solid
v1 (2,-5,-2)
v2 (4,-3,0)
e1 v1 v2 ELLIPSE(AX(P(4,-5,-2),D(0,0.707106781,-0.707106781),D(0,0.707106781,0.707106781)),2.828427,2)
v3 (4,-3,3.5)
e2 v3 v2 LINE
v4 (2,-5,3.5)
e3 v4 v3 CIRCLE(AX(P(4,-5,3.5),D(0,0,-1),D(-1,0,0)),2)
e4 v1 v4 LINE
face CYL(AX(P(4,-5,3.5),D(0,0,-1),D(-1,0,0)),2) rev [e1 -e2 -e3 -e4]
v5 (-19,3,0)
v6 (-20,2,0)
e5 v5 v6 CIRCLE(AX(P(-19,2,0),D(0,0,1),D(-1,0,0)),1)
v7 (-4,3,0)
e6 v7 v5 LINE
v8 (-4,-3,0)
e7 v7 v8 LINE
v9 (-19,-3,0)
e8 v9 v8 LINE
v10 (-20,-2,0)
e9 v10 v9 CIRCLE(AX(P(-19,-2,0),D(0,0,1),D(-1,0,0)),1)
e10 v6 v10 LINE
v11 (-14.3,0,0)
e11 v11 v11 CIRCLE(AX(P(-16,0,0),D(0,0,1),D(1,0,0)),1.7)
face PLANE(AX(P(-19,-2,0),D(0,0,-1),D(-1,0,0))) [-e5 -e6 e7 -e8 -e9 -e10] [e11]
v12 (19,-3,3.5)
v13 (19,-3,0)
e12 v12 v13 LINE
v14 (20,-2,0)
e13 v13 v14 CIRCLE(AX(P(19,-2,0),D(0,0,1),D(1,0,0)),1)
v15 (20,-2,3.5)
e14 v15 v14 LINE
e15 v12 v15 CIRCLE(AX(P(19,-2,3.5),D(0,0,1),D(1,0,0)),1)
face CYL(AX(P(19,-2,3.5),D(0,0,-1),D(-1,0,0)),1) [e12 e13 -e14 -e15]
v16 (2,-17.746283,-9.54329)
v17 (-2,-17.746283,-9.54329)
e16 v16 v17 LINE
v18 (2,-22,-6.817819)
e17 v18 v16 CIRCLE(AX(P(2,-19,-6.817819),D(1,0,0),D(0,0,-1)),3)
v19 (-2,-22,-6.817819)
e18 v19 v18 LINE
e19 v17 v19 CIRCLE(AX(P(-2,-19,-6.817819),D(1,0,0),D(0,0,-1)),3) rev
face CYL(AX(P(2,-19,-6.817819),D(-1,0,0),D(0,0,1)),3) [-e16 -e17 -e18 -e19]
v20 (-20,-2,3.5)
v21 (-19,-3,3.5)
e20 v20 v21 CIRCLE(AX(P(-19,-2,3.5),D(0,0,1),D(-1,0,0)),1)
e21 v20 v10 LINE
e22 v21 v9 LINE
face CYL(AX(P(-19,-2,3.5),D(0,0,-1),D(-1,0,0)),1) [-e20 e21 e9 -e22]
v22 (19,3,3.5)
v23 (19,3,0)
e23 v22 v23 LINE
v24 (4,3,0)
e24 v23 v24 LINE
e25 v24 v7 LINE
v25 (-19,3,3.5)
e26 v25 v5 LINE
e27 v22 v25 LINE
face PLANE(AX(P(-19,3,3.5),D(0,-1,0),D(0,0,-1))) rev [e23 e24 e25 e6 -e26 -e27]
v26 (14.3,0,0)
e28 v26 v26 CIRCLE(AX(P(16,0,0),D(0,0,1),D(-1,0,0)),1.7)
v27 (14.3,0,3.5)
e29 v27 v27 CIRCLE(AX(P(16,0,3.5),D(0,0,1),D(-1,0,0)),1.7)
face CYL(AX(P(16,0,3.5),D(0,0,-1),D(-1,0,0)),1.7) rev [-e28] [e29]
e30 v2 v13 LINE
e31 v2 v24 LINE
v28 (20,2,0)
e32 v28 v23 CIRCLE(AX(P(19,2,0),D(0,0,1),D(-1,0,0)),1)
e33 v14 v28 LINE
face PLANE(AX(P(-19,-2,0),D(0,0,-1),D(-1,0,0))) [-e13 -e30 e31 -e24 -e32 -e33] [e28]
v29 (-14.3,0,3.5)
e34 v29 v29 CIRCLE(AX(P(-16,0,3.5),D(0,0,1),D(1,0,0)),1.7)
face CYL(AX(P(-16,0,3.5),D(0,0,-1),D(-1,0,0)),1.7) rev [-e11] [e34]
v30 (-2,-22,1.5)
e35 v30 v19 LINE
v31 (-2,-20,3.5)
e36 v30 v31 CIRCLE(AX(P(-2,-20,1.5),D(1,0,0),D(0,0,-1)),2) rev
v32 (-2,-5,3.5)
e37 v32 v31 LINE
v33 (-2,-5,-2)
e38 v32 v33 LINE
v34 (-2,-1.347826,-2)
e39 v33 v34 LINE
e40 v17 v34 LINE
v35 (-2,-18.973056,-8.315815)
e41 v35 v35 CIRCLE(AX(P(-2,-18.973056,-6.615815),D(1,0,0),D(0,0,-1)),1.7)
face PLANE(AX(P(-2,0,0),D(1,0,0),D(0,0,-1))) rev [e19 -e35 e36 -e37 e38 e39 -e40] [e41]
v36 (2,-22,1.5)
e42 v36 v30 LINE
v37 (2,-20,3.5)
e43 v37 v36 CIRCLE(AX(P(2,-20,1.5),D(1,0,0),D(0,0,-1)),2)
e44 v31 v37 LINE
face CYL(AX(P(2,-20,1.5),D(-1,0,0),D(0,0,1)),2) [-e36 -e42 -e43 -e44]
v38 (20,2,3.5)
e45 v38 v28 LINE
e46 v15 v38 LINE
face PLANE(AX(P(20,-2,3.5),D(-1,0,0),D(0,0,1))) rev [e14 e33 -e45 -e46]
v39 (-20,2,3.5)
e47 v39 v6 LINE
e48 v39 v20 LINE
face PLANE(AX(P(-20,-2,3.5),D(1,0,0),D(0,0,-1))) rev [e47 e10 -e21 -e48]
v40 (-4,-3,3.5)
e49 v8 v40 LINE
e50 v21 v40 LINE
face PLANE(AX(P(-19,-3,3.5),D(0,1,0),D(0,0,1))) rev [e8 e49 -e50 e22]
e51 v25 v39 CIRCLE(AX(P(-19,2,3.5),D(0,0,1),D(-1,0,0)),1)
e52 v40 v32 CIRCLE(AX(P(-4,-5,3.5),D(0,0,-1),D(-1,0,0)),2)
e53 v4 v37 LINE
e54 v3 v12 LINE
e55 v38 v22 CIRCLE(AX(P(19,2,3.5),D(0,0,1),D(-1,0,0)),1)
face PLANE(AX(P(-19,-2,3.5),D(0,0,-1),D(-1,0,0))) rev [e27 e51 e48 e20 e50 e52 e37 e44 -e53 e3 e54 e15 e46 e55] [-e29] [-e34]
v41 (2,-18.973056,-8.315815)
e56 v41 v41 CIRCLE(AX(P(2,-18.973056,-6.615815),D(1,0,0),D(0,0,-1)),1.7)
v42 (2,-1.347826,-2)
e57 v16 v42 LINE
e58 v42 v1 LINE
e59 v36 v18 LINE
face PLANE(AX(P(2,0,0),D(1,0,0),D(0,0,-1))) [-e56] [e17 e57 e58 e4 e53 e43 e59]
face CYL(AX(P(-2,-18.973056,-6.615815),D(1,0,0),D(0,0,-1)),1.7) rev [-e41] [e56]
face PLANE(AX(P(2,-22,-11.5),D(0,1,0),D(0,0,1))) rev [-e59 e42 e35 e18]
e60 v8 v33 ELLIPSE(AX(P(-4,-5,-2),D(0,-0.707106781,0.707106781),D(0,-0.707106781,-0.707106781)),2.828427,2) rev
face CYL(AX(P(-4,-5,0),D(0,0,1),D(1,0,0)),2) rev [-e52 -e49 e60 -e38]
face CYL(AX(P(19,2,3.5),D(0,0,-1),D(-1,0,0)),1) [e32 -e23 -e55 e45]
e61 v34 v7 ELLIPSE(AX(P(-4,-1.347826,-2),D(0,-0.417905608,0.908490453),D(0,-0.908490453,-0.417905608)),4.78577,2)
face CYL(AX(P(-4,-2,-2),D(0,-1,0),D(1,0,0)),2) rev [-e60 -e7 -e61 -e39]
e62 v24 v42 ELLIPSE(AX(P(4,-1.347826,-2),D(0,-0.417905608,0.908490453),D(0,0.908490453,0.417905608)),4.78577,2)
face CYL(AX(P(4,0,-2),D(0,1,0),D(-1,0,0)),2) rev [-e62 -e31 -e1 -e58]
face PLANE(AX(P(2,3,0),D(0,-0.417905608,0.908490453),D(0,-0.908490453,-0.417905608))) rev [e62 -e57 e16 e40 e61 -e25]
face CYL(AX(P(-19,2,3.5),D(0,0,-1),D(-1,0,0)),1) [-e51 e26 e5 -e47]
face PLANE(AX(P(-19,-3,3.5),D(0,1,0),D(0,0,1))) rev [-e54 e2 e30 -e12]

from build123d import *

# Parameters (mm, degrees)
SKETCH3_R           = 1.7
BOSS_EXTRUDE1_DEPTH = 3.5
BOSS_EXTRUDE2_DEPTH = 2
FILLET1_R           = 2
SKETCH5_R           = 1.7
CUT_EXTRUDE1_DEPTH  = 4
FILLET2_R           = 3


with BuildPart() as part:
    # Sketch3 → Boss-Extrude1 (new body)
    with BuildSketch(Plane.XY):
        with BuildLine():
            Line((-19, -3), (19, -3))
            ThreePointArc((19, -3), (19.707106781, -2.707106781), (20, -2))
            Line((20, -2), (20, 2))
            ThreePointArc((20, 2), (19.707106781, 2.707106781), (19, 3))
            Line((19, 3), (-19, 3))
            ThreePointArc((-19, 3), (-19.707106781, 2.707106781), (-20, 2))
            Line((-20, 2), (-20, -2))
            ThreePointArc((-20, -2), (-19.707106781, -2.707106781), (-19, -3))
        make_face()
        with Locations((-16, 0)):
            Circle(SKETCH3_R, mode=Mode.SUBTRACT)
        with Locations(Location((16, 0, 0), (0, 0, 180))):
            Circle(SKETCH3_R, mode=Mode.SUBTRACT)
    extrude(amount=BOSS_EXTRUDE1_DEPTH)

    # Sketch4 → Boss-Extrude2 (add, symmetric)
    with BuildSketch(Plane(origin=(0, 0, 0), x_dir=(0, 0, -1), z_dir=(1, 0, 0))):
        Polygon((0, 3), (11.5, -22), (-3.5, -22), (-3.5, 3), align=None)
    extrude(amount=BOSS_EXTRUDE2_DEPTH, both=True)

    # Fillet1
    # the kernel refuses this fillet: 2 mm, written as the material it adds along each edge
    with BuildSketch(Plane(origin=(2, -3, 0), x_dir=(1, 0, 0), z_dir=(0, 0, 1))) as fillet1_piece_1:
        with BuildLine():
            CenterArc((FILLET1_R, -FILLET1_R), FILLET1_R, 90, 90)
            Line((0, -FILLET1_R), (0, 0))
            Line((0, 0), (FILLET1_R, 0))
        make_face()
    extrude(amount=3.5)
    with BuildSketch(Plane(origin=(-2, 3, 0), x_dir=(0, 0, -1), z_dir=(0, -1, 0))) as fillet1_piece_2_section:
        with BuildLine():
            CenterArc((FILLET1_R, -FILLET1_R), FILLET1_R, 90, 90)
            Line((0, -FILLET1_R), (0, 0))
            Line((0, 0), (FILLET1_R, 0))
        make_face()
    fillet1_piece_2 = extrude(amount=6, mode=Mode.PRIVATE)
    fillet1_piece_2 = split(fillet1_piece_2, bisect_by=Plane(origin=(-2.500058987, 0.046625327, -1.35855235), z_dir=(3.171977462044394e-15, -0.4179056082321443, 0.9084904526785746)), keep=Keep.TOP, mode=Mode.PRIVATE)
    add(fillet1_piece_2)
    with BuildSketch(Plane(origin=(2, 3, 0), x_dir=(0, 0, -1), z_dir=(0, -1, 0))) as fillet1_piece_3_section:
        with BuildLine():
            CenterArc((FILLET1_R, FILLET1_R), FILLET1_R, 180, 90)
            Line((0, FILLET1_R), (0, 0))
            Line((0, 0), (FILLET1_R, 0))
        make_face()
    fillet1_piece_3 = extrude(amount=6, mode=Mode.PRIVATE)
    fillet1_piece_3 = split(fillet1_piece_3, bisect_by=Plane(origin=(2.500058987, 0.046625327, -1.35855235), z_dir=(3.171977462044394e-15, -0.4179056082321443, 0.9084904526785746)), keep=Keep.TOP, mode=Mode.PRIVATE)
    add(fillet1_piece_3)
    with BuildSketch(Plane(origin=(-2, -3, 0), x_dir=(-1, 0, 0), z_dir=(0, 0, 1))) as fillet1_piece_4:
        with BuildLine():
            CenterArc((FILLET1_R, FILLET1_R), FILLET1_R, 180, 90)
            Line((0, FILLET1_R), (0, 0))
            Line((0, 0), (FILLET1_R, 0))
        make_face()
    extrude(amount=3.5)
    with BuildSketch(Plane(origin=(2, -3, -5), x_dir=(1, 0, 0), z_dir=(0, 0, 1))) as fillet1_piece_5a_section:
        with BuildLine():
            CenterArc((FILLET1_R, -FILLET1_R), FILLET1_R, 90, 90)
            Line((0, -FILLET1_R), (0, 0))
            Line((0, 0), (FILLET1_R, 0))
        make_face()
    fillet1_piece_5a = extrude(amount=8.5, mode=Mode.PRIVATE)
    fillet1_piece_5a = split(fillet1_piece_5a, bisect_by=Plane(origin=(2.435770174, -3.481600485, 0), z_dir=(0, 0, -1)), keep=Keep.TOP, mode=Mode.PRIVATE)
    fillet1_piece_5a = split(fillet1_piece_5a, bisect_by=Plane(origin=(2.435770174, -2.915610611, -2.721180881), z_dir=(3.171977462044394e-15, -0.4179056082321443, 0.9084904526785746)), keep=Keep.TOP, mode=Mode.PRIVATE)
    with BuildSketch(Plane(origin=(2, 3, 0), x_dir=(0, 0, -1), z_dir=(0, -1, 0))) as fillet1_piece_5b_section:
        with BuildLine():
            CenterArc((FILLET1_R, FILLET1_R), FILLET1_R, 180, 90)
            Line((0, FILLET1_R), (0, 0))
            Line((0, 0), (FILLET1_R, 0))
        make_face()
    fillet1_piece_5b = extrude(amount=11, mode=Mode.PRIVATE)
    fillet1_piece_5b = split(fillet1_piece_5b, bisect_by=Plane(origin=(2.452790229, -3, -0.452790229), z_dir=(0, -1, 0)), keep=Keep.TOP, mode=Mode.PRIVATE)
    fillet1_piece_5 = fillet1_piece_5a & fillet1_piece_5b
    add(fillet1_piece_5)
    with BuildSketch(Plane(origin=(-2, -3, -5), x_dir=(-1, 0, 0), z_dir=(0, 0, 1))) as fillet1_piece_6a_section:
        with BuildLine():
            CenterArc((FILLET1_R, FILLET1_R), FILLET1_R, 180, 90)
            Line((0, FILLET1_R), (0, 0))
            Line((0, 0), (FILLET1_R, 0))
        make_face()
    fillet1_piece_6a = extrude(amount=8.5, mode=Mode.PRIVATE)
    fillet1_piece_6a = split(fillet1_piece_6a, bisect_by=Plane(origin=(-2.435770174, -3.481600485, 0), z_dir=(0, 0, -1)), keep=Keep.TOP, mode=Mode.PRIVATE)
    fillet1_piece_6a = split(fillet1_piece_6a, bisect_by=Plane(origin=(-2.435770174, -2.915610611, -2.721180881), z_dir=(3.171977462044394e-15, -0.4179056082321443, 0.9084904526785746)), keep=Keep.TOP, mode=Mode.PRIVATE)
    with BuildSketch(Plane(origin=(-2, 3, 0), x_dir=(0, 0, -1), z_dir=(0, -1, 0))) as fillet1_piece_6b_section:
        with BuildLine():
            CenterArc((FILLET1_R, -FILLET1_R), FILLET1_R, 90, 90)
            Line((0, -FILLET1_R), (0, 0))
            Line((0, 0), (FILLET1_R, 0))
        make_face()
    fillet1_piece_6b = extrude(amount=11, mode=Mode.PRIVATE)
    fillet1_piece_6b = split(fillet1_piece_6b, bisect_by=Plane(origin=(-2.452790229, -3, -0.452790229), z_dir=(0, -1, 0)), keep=Keep.TOP, mode=Mode.PRIVATE)
    fillet1_piece_6 = fillet1_piece_6a & fillet1_piece_6b
    add(fillet1_piece_6)
    # the kernel refuses this fillet: 2 mm, written as the material it takes off along each edge
    with BuildSketch(Plane(origin=(7, -22, 3.5), x_dir=(0, 0, -1), z_dir=(-1, 0, 0))) as fillet1_2_piece_1:
        with BuildLine():
            CenterArc((FILLET1_R, -FILLET1_R), FILLET1_R, 90, 90)
            Line((0, -FILLET1_R), (0, 0))
            Line((0, 0), (FILLET1_R, 0))
        make_face()
    extrude(amount=14, mode=Mode.SUBTRACT)

    # Sketch5 → Cut-Extrude1 (cut)
    with BuildSketch(Plane(origin=(2, 0, 0), x_dir=(0, 0, -1), z_dir=(1, 0, 0))):
        with Locations((6.615815201, -18.97305612)):
            Circle(SKETCH5_R)
    extrude(amount=-CUT_EXTRUDE1_DEPTH, mode=Mode.SUBTRACT)

    # Fillet2
    fillet2_edges = [part.edges().sort_by_distance(p)[0] for p in [
        (0, -22, -11.5),
    ]]
    fillet(fillet2_edges, radius=FILLET2_R)


solid = part.part
